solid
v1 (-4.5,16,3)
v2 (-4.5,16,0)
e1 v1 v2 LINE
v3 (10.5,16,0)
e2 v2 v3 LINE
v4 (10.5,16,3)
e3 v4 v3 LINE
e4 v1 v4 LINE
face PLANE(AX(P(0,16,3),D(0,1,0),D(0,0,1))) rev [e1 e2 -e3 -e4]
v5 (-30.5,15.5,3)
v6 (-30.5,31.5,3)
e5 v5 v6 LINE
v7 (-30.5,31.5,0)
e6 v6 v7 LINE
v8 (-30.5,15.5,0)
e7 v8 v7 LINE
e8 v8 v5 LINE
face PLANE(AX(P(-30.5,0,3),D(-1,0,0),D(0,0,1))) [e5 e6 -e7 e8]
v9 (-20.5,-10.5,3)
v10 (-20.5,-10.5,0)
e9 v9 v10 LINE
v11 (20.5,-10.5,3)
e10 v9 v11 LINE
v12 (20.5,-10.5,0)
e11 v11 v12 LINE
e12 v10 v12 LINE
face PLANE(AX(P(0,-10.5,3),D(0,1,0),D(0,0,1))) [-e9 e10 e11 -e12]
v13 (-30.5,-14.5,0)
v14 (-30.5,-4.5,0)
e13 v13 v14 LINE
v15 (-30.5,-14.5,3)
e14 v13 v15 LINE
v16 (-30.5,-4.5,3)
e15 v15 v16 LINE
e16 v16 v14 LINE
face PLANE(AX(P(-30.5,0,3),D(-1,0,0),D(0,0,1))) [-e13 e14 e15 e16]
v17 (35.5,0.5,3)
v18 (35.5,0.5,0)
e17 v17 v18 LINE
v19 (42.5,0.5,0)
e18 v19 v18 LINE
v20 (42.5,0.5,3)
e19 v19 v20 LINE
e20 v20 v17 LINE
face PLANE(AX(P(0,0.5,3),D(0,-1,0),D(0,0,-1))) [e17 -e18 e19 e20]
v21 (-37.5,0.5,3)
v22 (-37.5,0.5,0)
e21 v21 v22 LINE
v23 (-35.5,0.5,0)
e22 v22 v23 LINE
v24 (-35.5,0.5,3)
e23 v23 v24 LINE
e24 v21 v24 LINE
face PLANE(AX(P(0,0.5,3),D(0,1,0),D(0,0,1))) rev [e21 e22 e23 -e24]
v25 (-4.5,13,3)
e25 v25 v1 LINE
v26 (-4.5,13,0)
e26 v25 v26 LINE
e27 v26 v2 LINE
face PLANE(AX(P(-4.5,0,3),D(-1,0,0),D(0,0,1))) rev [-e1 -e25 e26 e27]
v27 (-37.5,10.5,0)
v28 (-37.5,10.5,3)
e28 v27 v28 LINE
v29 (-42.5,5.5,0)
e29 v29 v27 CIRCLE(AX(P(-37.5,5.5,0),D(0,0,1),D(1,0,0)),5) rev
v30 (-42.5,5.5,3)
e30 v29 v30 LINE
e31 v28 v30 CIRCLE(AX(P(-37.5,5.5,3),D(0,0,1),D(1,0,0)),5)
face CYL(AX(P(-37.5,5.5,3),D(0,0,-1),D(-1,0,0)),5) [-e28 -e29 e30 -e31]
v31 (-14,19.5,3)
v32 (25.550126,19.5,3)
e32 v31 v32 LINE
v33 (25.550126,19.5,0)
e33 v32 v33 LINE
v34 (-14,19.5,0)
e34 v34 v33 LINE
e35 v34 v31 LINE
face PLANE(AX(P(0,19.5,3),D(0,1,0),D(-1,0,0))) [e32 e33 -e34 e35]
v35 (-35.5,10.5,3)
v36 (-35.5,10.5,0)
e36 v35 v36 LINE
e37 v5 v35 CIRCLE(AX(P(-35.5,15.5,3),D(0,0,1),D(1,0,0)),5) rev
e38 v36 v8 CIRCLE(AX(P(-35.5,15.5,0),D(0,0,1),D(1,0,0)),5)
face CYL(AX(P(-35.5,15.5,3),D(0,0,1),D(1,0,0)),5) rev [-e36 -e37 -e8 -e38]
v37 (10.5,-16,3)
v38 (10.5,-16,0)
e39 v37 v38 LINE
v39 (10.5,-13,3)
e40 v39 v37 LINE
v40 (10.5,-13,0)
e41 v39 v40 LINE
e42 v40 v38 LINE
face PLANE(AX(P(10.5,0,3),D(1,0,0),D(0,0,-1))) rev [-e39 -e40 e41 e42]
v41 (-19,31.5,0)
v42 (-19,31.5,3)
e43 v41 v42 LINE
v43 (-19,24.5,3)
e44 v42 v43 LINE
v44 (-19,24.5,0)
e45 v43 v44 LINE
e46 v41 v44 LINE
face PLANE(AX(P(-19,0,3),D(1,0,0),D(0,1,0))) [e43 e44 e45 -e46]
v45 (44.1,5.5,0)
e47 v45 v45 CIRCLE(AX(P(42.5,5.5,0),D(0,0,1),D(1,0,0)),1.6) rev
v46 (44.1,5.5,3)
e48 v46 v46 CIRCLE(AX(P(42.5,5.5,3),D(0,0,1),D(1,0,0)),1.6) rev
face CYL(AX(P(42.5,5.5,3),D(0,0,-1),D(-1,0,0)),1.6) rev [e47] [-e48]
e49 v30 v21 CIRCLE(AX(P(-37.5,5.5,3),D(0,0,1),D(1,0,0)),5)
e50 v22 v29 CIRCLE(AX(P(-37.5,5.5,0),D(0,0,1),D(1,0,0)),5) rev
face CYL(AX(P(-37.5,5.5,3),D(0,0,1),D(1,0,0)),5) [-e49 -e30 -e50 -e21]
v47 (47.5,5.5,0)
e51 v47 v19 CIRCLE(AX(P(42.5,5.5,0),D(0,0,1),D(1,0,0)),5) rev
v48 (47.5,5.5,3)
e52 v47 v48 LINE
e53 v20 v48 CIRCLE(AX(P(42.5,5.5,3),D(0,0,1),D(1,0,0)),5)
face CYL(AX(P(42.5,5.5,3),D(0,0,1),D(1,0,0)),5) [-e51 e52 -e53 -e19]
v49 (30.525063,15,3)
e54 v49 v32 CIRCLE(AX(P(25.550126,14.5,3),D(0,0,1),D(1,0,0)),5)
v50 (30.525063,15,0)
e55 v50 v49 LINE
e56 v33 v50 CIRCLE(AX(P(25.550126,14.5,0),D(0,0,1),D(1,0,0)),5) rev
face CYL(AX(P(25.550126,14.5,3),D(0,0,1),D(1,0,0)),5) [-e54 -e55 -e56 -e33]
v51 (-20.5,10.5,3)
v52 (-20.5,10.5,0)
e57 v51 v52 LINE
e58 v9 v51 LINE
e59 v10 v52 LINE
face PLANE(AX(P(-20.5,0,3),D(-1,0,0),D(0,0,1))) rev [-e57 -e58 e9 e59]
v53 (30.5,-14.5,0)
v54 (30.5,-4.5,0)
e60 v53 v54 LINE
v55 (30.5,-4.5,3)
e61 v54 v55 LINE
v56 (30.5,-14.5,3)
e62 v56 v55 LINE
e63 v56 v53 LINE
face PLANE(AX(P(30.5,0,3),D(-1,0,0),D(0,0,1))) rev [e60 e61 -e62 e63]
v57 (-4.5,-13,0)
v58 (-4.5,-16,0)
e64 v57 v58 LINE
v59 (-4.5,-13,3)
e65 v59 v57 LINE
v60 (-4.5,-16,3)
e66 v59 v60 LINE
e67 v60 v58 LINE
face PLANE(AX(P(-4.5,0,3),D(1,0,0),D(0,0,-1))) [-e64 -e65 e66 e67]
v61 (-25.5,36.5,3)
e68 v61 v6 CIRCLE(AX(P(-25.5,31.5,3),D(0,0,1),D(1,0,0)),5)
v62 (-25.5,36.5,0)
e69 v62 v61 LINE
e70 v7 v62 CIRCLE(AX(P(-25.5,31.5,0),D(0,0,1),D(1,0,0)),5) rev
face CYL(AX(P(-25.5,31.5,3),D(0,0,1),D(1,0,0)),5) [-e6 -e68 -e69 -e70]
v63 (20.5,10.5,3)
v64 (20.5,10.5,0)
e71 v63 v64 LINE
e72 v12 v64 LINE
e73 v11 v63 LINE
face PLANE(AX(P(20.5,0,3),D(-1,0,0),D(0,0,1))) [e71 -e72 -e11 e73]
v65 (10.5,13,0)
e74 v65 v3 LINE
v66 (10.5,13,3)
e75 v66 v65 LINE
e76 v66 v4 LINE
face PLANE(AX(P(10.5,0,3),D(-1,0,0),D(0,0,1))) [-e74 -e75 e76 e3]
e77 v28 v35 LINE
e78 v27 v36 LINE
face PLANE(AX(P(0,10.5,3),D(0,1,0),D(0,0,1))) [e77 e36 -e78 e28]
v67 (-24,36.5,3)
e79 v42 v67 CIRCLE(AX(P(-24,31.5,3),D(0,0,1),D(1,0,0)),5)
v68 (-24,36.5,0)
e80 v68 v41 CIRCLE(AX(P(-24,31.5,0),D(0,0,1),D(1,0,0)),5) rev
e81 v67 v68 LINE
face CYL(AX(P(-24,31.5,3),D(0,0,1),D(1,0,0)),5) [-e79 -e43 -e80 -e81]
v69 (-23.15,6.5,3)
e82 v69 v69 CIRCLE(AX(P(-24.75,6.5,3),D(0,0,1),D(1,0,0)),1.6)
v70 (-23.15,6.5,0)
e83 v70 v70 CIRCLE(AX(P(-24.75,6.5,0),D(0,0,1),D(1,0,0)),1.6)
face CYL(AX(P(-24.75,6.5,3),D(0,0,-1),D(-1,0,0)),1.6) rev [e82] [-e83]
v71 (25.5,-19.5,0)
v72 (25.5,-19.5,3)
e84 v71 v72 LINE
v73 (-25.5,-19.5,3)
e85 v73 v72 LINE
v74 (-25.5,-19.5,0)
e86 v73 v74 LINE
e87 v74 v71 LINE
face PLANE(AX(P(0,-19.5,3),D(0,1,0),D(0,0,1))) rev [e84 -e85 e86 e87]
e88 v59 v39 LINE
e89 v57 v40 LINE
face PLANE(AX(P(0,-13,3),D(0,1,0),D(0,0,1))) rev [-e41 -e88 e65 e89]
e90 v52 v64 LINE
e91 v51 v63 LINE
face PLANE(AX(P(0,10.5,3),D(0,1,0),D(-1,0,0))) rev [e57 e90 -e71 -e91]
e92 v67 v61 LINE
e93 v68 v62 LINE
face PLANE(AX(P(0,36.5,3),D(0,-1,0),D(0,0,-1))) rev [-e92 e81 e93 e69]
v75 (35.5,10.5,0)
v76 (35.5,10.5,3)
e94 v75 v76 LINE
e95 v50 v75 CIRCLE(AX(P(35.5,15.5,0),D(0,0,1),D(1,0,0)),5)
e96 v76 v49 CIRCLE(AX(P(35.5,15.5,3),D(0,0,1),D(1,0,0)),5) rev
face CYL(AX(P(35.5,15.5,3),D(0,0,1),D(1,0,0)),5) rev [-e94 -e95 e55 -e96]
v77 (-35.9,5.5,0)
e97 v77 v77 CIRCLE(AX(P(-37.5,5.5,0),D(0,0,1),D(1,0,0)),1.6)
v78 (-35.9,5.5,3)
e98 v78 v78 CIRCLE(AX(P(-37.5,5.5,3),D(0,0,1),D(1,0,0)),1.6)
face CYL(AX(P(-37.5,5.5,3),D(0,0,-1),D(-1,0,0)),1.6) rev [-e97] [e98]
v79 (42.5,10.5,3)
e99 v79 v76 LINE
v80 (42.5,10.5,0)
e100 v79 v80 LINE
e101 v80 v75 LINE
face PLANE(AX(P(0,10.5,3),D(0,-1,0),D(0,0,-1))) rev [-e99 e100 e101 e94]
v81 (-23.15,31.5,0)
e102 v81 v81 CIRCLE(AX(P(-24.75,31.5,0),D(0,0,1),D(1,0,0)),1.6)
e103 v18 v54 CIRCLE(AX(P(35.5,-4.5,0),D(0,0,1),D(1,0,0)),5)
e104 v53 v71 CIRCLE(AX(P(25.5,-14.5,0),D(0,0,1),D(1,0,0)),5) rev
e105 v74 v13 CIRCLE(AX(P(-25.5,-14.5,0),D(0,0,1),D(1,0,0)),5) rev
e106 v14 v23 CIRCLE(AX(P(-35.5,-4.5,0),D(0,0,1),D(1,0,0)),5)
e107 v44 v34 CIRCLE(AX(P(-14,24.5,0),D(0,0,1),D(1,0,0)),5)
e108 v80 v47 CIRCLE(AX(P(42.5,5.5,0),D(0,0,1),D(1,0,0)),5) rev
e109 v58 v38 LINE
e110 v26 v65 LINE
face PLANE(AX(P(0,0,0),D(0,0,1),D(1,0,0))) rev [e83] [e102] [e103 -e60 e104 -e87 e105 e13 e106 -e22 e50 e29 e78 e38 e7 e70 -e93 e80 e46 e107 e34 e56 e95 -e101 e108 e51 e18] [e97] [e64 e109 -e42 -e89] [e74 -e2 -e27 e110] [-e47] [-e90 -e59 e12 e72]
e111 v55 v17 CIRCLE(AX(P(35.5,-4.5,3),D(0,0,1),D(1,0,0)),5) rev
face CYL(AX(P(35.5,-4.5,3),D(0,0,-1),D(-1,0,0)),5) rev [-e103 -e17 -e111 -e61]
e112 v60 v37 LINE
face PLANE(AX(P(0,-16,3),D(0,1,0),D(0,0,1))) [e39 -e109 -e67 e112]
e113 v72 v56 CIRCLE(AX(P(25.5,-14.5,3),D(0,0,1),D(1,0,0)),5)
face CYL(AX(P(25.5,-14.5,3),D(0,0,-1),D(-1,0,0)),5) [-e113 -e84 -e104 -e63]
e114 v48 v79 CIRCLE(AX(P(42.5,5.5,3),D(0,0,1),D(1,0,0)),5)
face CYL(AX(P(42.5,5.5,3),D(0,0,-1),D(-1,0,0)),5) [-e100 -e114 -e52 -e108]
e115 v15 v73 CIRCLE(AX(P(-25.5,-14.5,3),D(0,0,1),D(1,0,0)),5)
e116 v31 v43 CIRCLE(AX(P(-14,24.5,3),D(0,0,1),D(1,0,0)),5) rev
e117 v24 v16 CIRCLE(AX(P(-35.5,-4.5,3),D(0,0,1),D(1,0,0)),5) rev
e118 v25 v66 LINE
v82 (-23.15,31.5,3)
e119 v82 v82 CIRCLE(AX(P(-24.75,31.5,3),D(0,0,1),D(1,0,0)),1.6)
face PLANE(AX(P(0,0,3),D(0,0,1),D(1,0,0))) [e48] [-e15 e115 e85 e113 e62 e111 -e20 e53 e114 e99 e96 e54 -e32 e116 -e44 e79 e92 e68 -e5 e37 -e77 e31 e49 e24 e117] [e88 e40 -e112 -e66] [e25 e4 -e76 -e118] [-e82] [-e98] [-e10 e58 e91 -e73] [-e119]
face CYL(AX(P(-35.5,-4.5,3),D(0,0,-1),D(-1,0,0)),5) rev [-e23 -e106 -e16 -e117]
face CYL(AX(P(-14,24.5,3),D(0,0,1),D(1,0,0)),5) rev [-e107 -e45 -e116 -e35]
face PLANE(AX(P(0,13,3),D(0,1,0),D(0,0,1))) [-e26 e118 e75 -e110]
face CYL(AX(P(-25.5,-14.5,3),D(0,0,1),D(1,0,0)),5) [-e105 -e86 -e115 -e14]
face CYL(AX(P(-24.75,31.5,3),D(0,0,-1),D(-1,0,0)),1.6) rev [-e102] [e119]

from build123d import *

# Parameters (mm, degrees)
ESBO_O1_R                = 1.6
ESBO_O1_W                = 41
ESBO_O1_H                = 21
ESBO_O1_W_2              = 15
ESBO_O1_H_2              = 3
RESSALTO_EXTRUS_O1_DEPTH = 3
FILETE1_R                = 5
FILETE4_R                = 5


with BuildPart() as part:
    # Esboço1 → Ressalto-extrusão1 (new body)
    with BuildSketch(Plane.XY):
        Polygon((-30.5, 0.5), (-30.5, -19.5), (30.5, -19.5), (30.5, 0.5), (47.5, 0.5), (47.5, 10.5), (30.5, 10.5), (30.5, 19.5), (-19, 19.5), (-19, 36.5), (-30.5, 36.5), (-30.5, 10.5), (-42.5, 10.5), (-42.5, 0.5), align=None)
        with Locations((-24.75, 6.5)):
            Circle(ESBO_O1_R, mode=Mode.SUBTRACT)
        Rectangle(ESBO_O1_W, ESBO_O1_H, mode=Mode.SUBTRACT)
        with Locations((3, -14.5)):
            Rectangle(ESBO_O1_W_2, ESBO_O1_H_2, mode=Mode.SUBTRACT)
        with Locations((3, 14.5)):
            Rectangle(ESBO_O1_W_2, ESBO_O1_H_2, mode=Mode.SUBTRACT)
        with Locations((-37.5, 5.5)):
            Circle(ESBO_O1_R, mode=Mode.SUBTRACT)
        with Locations((42.5, 5.5)):
            Circle(ESBO_O1_R, mode=Mode.SUBTRACT)
        with Locations((-24.75, 31.5)):
            Circle(ESBO_O1_R, mode=Mode.SUBTRACT)
    extrude(amount=RESSALTO_EXTRUS_O1_DEPTH)

    # Filete1
    filete1_edges = [part.edges().sort_by_distance(p)[0] for p in [
        (-19, 36.5, 1.5),
        (-30.5, 36.5, 1.5),
        (30.5, -19.5, 1.5),
        (-30.5, -19.5, 1.5),
        (-42.5, 0.5, 1.5),
        (-19, 19.5, 1.5),
        (-30.5, 0.5, 1.5),
        (-30.5, 10.5, 1.5),
        (-42.5, 10.5, 1.5),
        (30.5, 0.5, 1.5),
        (47.5, 0.5, 1.5),
        (47.5, 10.5, 1.5),
        (30.5, 10.5, 1.5),
    ]]
    fillet(filete1_edges, radius=FILETE1_R - 0.0001)  # a hair under: the kernel refuses the full size

    # Filete4
    filete4_edges = [part.edges().sort_by_distance(p)[0] for p in [
        (30.5, 19.5, 1.5),
    ]]
    fillet(filete4_edges, radius=FILETE4_R)


solid = part.part
